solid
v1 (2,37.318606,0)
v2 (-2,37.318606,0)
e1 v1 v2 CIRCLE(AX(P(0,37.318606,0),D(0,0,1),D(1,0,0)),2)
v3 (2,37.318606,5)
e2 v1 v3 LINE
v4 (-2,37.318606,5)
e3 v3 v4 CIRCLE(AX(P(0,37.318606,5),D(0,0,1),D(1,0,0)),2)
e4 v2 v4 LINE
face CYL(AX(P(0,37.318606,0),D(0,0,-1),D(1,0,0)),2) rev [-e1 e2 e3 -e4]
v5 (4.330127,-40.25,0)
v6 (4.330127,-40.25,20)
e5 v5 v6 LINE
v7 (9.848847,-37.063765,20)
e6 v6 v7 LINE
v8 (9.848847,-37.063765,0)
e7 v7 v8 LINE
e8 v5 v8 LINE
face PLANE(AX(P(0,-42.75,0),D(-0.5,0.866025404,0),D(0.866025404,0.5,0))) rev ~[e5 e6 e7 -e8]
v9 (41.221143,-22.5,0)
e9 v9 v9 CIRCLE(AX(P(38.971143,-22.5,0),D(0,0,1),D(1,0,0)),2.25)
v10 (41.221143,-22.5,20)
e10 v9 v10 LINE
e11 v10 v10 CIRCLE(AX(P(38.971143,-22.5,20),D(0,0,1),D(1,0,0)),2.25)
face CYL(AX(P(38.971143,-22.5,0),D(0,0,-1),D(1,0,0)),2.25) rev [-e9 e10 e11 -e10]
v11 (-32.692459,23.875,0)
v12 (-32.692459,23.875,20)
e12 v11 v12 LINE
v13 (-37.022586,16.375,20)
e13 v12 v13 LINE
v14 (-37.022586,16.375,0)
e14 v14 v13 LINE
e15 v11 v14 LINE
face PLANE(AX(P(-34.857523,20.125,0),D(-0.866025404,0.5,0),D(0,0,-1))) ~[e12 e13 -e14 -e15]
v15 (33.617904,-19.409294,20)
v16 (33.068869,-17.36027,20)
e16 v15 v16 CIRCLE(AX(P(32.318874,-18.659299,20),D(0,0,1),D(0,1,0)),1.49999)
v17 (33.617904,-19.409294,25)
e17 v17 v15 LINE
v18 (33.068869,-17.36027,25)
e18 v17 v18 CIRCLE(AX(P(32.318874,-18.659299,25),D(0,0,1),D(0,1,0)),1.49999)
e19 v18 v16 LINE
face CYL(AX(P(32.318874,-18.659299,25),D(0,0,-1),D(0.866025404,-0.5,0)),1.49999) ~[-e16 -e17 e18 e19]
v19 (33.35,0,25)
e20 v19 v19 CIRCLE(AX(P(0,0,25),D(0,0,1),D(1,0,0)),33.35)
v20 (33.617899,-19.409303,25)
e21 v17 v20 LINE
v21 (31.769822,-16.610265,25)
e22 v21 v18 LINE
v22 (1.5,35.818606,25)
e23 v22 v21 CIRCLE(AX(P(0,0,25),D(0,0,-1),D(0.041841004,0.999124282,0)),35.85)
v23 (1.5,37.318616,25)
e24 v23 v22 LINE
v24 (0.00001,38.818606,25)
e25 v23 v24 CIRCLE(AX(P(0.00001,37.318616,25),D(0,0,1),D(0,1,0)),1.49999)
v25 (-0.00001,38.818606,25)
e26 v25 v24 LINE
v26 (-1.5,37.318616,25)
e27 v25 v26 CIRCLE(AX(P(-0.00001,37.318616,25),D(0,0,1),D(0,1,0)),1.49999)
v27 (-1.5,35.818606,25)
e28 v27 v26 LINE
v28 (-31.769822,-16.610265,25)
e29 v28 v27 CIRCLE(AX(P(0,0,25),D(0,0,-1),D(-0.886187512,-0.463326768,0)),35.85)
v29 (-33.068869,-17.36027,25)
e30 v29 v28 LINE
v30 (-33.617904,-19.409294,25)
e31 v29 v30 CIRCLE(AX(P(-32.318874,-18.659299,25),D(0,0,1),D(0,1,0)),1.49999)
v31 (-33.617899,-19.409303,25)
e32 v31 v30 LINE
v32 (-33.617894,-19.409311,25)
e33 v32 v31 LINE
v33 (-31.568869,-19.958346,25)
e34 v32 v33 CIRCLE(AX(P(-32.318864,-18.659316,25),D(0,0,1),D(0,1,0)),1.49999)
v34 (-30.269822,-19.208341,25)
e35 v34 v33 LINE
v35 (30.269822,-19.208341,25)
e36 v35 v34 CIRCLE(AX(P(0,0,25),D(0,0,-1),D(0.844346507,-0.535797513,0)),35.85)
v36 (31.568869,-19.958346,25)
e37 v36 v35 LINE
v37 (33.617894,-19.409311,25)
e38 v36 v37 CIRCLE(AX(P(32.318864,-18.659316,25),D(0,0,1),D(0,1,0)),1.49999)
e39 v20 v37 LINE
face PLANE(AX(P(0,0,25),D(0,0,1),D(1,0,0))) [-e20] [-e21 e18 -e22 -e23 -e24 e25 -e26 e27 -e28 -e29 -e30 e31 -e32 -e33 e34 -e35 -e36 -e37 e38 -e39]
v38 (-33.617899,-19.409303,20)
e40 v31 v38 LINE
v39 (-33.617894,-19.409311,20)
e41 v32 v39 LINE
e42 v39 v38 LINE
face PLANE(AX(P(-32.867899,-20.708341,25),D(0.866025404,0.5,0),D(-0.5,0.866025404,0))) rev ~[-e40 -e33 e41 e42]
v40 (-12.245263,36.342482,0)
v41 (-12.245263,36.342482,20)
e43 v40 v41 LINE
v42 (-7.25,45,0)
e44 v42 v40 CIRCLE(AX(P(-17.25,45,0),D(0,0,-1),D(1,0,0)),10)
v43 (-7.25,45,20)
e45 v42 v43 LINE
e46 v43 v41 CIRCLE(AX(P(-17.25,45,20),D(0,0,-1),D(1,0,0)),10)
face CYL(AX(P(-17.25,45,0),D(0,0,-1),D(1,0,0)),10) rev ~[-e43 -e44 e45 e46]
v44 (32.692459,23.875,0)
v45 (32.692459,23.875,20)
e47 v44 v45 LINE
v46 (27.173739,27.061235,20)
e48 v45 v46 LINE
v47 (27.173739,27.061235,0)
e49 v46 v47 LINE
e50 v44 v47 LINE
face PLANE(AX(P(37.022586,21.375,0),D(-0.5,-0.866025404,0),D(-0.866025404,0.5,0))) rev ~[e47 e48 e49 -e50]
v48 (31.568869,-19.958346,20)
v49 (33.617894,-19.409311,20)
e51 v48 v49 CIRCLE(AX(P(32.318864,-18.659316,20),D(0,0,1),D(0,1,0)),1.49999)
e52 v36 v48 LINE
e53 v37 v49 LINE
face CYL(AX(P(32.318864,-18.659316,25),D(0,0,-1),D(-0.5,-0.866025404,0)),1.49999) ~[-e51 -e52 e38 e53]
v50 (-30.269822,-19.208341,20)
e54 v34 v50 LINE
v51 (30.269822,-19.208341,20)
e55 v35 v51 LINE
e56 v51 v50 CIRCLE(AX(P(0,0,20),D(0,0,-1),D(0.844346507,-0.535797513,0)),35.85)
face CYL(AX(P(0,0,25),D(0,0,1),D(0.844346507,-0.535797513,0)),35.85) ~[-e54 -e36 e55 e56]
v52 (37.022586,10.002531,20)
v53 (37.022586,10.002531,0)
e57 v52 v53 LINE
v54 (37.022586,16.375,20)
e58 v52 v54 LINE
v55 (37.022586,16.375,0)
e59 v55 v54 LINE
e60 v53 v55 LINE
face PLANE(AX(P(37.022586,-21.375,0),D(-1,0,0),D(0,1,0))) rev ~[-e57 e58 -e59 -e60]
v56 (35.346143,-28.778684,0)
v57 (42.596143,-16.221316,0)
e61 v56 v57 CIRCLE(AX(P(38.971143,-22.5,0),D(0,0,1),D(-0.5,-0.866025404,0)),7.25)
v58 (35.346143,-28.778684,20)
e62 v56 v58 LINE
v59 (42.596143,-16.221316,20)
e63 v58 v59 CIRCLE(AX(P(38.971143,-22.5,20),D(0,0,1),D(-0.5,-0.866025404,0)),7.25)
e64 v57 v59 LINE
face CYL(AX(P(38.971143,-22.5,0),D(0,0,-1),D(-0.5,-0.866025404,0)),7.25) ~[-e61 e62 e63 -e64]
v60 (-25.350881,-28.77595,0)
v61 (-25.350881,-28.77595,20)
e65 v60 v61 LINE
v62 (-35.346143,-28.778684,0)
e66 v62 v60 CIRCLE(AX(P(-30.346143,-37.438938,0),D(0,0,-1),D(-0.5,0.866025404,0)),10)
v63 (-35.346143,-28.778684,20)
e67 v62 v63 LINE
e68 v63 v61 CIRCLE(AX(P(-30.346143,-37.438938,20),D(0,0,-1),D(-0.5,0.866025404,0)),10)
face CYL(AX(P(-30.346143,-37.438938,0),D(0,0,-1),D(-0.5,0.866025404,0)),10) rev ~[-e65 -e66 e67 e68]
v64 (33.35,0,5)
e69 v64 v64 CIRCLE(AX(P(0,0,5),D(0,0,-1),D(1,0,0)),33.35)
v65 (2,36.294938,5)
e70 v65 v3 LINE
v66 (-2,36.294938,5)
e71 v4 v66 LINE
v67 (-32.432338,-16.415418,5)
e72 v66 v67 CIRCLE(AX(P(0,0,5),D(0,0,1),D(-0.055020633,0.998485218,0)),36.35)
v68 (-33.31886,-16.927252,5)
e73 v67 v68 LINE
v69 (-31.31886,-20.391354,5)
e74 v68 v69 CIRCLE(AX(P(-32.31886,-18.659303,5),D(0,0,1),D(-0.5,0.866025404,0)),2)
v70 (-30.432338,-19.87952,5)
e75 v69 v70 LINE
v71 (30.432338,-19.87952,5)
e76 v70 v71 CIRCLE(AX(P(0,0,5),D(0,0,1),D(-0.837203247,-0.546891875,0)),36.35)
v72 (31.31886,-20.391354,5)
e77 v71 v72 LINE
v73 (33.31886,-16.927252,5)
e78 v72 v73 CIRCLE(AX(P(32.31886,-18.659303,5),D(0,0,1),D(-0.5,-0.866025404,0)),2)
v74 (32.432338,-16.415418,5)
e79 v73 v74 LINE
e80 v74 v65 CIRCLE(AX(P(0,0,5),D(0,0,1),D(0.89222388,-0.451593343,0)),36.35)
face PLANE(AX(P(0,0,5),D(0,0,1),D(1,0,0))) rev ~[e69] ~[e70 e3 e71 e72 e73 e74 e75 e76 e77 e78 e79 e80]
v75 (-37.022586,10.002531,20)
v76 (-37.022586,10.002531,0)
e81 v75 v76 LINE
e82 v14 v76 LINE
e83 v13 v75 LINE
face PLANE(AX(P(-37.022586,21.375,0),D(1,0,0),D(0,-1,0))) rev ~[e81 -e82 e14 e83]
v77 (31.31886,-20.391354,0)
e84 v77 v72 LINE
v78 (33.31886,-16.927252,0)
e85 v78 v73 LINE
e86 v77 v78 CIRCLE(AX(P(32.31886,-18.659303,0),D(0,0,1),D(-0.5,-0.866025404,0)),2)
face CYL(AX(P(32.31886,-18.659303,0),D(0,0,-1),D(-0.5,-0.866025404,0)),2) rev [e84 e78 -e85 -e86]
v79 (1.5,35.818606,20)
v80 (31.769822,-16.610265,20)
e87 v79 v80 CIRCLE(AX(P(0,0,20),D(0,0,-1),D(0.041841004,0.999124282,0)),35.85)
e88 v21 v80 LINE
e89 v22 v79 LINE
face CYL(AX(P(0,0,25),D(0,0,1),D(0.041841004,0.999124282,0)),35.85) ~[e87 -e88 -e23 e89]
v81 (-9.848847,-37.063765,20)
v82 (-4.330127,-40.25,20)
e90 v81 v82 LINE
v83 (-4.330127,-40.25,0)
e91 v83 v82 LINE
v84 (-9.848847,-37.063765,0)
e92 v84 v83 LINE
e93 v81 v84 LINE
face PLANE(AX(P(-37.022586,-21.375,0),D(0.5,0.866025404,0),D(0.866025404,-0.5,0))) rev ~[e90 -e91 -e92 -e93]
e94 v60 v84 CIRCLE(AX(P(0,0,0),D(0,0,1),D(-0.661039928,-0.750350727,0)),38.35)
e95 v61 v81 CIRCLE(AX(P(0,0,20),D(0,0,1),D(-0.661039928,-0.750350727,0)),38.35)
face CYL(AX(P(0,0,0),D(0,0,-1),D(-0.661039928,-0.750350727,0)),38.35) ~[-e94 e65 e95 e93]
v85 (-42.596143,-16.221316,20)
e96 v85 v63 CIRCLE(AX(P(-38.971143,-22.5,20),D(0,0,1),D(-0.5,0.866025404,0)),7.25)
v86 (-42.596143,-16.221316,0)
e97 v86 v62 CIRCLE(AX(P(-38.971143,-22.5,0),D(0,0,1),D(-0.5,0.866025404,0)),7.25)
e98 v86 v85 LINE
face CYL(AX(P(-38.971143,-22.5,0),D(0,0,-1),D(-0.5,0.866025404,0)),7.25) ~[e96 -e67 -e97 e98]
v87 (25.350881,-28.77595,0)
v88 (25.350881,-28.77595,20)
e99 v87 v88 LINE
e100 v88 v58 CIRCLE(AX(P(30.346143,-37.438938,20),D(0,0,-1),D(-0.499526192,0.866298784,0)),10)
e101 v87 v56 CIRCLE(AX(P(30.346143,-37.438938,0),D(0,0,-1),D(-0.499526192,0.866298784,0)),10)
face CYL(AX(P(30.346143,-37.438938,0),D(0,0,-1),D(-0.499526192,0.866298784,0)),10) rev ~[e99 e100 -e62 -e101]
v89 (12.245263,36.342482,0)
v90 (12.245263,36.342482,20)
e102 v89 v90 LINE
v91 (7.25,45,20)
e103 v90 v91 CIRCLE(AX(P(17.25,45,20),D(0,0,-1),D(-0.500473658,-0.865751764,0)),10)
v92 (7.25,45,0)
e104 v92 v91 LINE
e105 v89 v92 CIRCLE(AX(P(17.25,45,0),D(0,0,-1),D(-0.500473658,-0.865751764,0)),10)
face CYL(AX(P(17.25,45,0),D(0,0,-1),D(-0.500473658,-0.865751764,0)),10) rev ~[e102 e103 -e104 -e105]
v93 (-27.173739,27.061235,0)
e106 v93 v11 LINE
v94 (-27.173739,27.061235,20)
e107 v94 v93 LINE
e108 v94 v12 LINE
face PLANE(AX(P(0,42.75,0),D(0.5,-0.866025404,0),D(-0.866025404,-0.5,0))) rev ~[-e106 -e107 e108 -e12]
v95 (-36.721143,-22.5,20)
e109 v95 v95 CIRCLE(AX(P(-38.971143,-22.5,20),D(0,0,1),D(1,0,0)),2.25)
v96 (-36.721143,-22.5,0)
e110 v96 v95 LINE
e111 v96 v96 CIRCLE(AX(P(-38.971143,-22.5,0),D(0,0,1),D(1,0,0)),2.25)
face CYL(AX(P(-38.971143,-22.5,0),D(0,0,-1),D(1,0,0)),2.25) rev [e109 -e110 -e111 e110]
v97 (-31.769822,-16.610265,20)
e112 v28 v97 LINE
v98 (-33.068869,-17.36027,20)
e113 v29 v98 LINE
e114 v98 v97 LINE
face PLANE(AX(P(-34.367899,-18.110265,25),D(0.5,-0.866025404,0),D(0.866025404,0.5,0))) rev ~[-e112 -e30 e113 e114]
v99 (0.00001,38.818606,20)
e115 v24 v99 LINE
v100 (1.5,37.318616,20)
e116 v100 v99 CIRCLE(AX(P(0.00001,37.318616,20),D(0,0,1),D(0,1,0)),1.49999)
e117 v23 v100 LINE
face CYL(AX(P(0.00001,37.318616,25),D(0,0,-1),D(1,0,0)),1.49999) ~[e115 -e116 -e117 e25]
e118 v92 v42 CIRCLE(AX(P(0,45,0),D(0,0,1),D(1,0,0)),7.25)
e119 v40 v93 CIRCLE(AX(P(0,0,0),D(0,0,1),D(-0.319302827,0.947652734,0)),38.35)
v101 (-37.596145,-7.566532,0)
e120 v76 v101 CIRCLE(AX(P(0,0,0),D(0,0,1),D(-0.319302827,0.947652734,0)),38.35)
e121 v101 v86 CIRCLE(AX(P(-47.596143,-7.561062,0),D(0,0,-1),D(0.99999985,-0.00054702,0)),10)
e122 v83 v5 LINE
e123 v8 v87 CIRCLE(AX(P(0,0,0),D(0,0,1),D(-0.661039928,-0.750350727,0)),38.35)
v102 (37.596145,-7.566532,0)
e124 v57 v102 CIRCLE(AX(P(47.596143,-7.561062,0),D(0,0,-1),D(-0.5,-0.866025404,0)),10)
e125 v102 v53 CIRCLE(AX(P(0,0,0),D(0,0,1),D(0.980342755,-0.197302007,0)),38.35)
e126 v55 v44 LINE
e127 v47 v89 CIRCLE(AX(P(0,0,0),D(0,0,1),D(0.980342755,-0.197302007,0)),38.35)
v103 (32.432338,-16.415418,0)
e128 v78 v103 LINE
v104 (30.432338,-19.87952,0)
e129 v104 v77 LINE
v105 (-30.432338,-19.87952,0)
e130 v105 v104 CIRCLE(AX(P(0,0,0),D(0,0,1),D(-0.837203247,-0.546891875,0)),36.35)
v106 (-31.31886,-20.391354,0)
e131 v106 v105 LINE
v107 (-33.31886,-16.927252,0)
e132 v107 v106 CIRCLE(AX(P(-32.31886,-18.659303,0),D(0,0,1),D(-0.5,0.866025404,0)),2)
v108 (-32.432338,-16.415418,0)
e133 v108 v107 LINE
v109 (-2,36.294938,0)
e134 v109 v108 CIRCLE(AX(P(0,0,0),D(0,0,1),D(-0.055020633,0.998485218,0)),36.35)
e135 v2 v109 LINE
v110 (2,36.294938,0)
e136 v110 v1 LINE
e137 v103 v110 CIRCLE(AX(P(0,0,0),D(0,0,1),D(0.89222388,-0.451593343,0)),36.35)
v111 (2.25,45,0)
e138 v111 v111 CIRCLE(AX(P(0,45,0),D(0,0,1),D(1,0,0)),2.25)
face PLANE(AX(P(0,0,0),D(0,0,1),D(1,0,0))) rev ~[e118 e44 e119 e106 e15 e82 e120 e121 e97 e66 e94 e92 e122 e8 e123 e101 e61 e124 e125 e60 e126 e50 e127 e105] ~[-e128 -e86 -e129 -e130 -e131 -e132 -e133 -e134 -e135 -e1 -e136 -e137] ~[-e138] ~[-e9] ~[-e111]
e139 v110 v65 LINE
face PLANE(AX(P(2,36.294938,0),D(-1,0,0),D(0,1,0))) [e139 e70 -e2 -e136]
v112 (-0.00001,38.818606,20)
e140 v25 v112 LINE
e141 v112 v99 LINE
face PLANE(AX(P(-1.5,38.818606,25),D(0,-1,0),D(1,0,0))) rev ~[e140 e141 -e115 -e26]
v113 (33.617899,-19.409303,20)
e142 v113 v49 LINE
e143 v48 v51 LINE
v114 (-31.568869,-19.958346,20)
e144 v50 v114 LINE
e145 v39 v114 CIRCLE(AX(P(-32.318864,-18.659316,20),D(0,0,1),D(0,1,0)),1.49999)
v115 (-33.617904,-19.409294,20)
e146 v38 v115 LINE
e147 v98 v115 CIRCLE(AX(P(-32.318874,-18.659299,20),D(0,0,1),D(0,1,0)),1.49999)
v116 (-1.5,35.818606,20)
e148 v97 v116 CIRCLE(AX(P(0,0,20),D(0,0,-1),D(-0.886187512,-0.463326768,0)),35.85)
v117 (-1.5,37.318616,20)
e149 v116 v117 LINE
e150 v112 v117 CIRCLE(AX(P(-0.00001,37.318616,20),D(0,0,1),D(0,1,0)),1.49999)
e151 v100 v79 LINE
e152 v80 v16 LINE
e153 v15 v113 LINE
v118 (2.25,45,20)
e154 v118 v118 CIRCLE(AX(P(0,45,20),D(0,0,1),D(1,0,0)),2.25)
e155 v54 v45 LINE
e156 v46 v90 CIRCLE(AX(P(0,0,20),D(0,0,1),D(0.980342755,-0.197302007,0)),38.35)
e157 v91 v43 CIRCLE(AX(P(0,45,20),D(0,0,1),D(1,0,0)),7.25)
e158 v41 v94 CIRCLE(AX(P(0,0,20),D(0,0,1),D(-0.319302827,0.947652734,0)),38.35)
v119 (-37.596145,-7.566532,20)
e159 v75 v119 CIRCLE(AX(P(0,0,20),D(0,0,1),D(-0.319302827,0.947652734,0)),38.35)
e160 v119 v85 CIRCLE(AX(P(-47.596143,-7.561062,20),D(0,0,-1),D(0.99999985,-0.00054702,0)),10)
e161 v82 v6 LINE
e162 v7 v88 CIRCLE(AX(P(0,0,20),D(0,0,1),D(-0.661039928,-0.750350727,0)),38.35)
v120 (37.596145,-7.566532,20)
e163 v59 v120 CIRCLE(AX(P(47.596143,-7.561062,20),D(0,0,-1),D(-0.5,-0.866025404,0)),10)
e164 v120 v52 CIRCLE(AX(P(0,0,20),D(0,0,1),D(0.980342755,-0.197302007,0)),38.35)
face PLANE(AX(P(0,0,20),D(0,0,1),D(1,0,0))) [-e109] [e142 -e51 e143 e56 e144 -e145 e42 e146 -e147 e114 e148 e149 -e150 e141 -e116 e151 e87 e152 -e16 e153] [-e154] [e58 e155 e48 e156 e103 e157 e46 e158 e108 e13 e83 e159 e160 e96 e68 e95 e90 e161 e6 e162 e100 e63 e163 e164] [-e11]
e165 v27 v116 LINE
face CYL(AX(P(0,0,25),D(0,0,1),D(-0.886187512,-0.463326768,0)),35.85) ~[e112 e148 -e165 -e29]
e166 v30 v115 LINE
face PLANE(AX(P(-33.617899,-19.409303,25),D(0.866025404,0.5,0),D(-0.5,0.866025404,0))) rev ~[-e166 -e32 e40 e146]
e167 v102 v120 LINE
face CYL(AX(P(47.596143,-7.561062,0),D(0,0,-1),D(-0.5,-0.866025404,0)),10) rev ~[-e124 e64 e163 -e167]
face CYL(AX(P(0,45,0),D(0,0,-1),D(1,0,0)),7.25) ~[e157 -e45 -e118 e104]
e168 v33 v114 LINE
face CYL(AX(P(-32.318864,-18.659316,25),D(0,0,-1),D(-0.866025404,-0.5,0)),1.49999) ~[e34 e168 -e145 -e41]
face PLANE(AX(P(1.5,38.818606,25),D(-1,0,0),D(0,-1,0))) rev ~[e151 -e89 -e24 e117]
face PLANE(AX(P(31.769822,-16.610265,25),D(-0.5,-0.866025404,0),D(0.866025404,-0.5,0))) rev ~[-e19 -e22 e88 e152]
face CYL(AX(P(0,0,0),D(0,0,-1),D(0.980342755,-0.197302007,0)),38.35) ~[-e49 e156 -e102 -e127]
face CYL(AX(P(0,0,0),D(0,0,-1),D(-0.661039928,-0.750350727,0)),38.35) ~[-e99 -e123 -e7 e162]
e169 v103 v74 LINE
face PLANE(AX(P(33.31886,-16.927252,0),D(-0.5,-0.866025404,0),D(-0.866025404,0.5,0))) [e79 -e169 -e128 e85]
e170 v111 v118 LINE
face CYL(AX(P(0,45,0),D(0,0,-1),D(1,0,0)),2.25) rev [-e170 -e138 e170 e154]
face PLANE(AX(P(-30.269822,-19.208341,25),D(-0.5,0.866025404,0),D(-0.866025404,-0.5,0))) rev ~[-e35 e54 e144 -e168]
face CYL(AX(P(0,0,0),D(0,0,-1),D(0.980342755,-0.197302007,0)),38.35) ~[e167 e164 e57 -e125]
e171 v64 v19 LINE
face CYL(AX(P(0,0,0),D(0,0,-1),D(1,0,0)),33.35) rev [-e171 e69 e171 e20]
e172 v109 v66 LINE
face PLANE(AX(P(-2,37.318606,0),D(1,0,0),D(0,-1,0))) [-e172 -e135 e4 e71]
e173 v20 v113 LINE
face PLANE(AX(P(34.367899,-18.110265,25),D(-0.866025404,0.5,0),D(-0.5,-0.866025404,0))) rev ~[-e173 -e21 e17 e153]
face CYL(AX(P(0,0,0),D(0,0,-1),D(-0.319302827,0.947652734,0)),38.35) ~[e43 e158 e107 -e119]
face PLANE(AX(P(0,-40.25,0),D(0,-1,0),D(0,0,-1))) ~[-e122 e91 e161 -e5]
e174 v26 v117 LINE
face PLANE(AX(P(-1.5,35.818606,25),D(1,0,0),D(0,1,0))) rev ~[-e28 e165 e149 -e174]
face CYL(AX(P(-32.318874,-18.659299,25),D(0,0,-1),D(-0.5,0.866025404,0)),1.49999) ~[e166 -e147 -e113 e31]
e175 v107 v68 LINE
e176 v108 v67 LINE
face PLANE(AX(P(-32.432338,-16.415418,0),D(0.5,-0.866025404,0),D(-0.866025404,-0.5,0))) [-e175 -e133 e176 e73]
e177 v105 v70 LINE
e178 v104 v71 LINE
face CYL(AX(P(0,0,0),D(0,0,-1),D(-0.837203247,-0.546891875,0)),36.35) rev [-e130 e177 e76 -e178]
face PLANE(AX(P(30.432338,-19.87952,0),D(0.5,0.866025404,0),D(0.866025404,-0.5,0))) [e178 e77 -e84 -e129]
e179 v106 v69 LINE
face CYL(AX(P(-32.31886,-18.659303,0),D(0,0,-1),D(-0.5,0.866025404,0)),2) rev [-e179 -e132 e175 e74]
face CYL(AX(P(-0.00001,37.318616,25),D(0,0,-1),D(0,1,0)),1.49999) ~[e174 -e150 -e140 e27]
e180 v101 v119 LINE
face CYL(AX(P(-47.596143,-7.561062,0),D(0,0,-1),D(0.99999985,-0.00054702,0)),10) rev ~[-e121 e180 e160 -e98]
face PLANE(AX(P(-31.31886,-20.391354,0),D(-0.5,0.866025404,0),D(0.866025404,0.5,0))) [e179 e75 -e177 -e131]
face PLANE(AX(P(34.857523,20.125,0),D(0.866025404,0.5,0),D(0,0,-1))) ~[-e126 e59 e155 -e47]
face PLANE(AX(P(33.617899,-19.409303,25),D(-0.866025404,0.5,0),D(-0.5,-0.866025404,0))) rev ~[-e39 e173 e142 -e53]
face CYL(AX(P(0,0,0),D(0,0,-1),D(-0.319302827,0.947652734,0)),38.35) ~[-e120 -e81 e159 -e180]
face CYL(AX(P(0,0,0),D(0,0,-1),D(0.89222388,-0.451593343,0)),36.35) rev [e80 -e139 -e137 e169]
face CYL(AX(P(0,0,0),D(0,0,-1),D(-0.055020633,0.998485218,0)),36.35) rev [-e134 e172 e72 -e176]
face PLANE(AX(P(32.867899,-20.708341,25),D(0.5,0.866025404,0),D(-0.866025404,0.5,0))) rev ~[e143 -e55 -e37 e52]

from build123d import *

# Parameters (mm, degrees)
F0_R     = 2.25
F0_R_2   = 33.35
F1_DEPTH = 20
F2_R     = 33.35
F3_DEPTH = 25
F5_DEPTH = 5
F6_R     = 1.49999
F8_DEPTH = 5
F9_SIZE  = 5


# Not quite as in the source:
# - a fillet or chamfer is up to 0.001 mm smaller than in the source, because OpenCascade refuses the exact size


with BuildPart() as f1:
    # F0 (on Top) → F1 (new body)
    with BuildSketch(Plane.XY):
        with BuildLine():
            ThreePointArc((-35.3461431703, -28.7786841774), (-30.3488782685, -27.4389385893), (-25.3508812473, -28.775950375))
            ThreePointArc((-25.3508812473, -28.775950375), (0, -38.35), (25.3508812473, -28.775950375))
            ThreePointArc((25.3508812473, -28.775950375), (30.3488782685, -27.4389385893), (35.3461431703, -28.7786841774))
            ThreePointArc((35.3461431703, -28.7786841774), (45.2498273477, -26.125), (42.5961431703, -16.2213158226))
            ThreePointArc((42.5961431703, -16.2213158226), (38.9372570055, -12.5634302623), (37.5961446665, -7.566531981))
            ThreePointArc((37.5961446665, -7.566531981), (33.2120742351, 19.175), (12.2452634191, 36.342482356))
            ThreePointArc((12.2452634191, 36.342482356), (8.588378737, 40.0023688516), (7.25, 45))
            ThreePointArc((7.25, 45), (0, 52.25), (-7.25, 45))
            ThreePointArc((-7.25, 45), (-8.588378737, 40.0023688516), (-12.2452634191, 36.342482356))
            ThreePointArc((-12.2452634191, 36.342482356), (-33.2120742351, 19.175), (-37.5961446665, -7.566531981))
            ThreePointArc((-37.5961446665, -7.566531981), (-38.9372570055, -12.5634302623), (-42.5961431703, -16.2213158226))
            ThreePointArc((-42.5961431703, -16.2213158226), (-45.2498273477, -26.125), (-35.3461431703, -28.7786841774))
        make_face()
        with Locations((-38.9711431703, -22.5)):
            Circle(F0_R, mode=Mode.SUBTRACT)
        with Locations((38.9711431703, -22.5)):
            Circle(F0_R, mode=Mode.SUBTRACT)
        Circle(F0_R_2, mode=Mode.SUBTRACT)
        with Locations((0, 45)):
            Circle(F0_R, mode=Mode.SUBTRACT)
    extrude(amount=F1_DEPTH)

    # F2 (on Top) → F3 (join)
    with BuildSketch(Plane.XY):
        Polygon((37.0225860118, -21.375), (37.0225860118, 21.375), (0, 42.75), (-37.0225860118, 21.375), (-37.0225860118, -21.375), (0, -42.75), align=None)
        Circle(F2_R, mode=Mode.SUBTRACT)
    extrude(amount=F3_DEPTH)

    # F4 (on face) → F5 (cut)
    with BuildSketch(Plane.XY.offset(25)):
        Polygon((37.0225860118, -21.375), (37.0225860118, 21.375), (0, 42.75), (-37.0225860118, 21.375), (-37.0225860118, -21.375), (0, -42.75), align=None)
        with BuildLine():
            ThreePointArc((-31.7698222916, -16.6102646446), (-31.0470107257, 17.925), (-1.5, 35.8186055005))
            Line((-1.5, 35.8186055005), (-1.5, 38.8186055005))
            Line((-1.5, 38.8186055005), (0, 38.8186055005))
            Line((0, 38.8186055005), (1.5, 38.8186055005))
            Line((1.5, 38.8186055005), (1.5, 35.8186055005))
            ThreePointArc((1.5, 35.8186055005), (31.0470107257, 17.925), (31.7698222916, -16.6102646446))
            Line((31.7698222916, -16.6102646446), (34.3678985029, -18.1102646446))
            Line((34.3678985029, -18.1102646446), (33.6178985029, -19.4093027502))
            Line((33.6178985029, -19.4093027502), (32.8678985029, -20.7083408559))
            Line((32.8678985029, -20.7083408559), (30.2698222916, -19.2083408559))
            ThreePointArc((30.2698222916, -19.2083408559), (0, -35.85), (-30.2698222916, -19.2083408559))
            Line((-30.2698222916, -19.2083408559), (-32.8678985029, -20.7083408559))
            Line((-32.8678985029, -20.7083408559), (-33.6178985029, -19.4093027502))
            Line((-33.6178985029, -19.4093027502), (-34.3678985029, -18.1102646446))
            Line((-34.3678985029, -18.1102646446), (-31.7698222916, -16.6102646446))
        make_face(mode=Mode.SUBTRACT)
    extrude(amount=-F5_DEPTH, mode=Mode.SUBTRACT)

    # F6 (radius 1.5 in the source; OpenCascade refuses exactly that, so slightly less here)
    f6_edges = [f1.edges().sort_by_distance(p)[0] for p in [
        (-32.867899, -20.708341, 22.5),
        (-34.367899, -18.110265, 22.5),
        (32.867899, -20.708341, 22.5),
        (34.367899, -18.110265, 22.5),
        (1.5, 38.818606, 22.5),
        (-1.5, 38.818606, 22.5),
    ]]
    fillet(f6_edges, radius=F6_R)

    # F7 (on Top) → F8 (cut)
    with BuildSketch(Plane.XY):
        with BuildLine():
            Line((-31.3188603972, -20.3913535578), (-30.4323380454, -19.8795196393))
            ThreePointArc((-30.4323380454, -19.8795196393), (0, -36.35), (30.4323380454, -19.8795196393))
            Line((30.4323380454, -19.8795196393), (31.3188603972, -20.3913535578))
            ThreePointArc((31.3188603972, -20.3913535578), (34.0509112048, -19.6593027502), (33.3188603972, -16.9272519427))
            Line((33.3188603972, -16.9272519427), (32.4323380454, -16.4154180242))
            ThreePointArc((32.4323380454, -16.4154180242), (31.4800234276, 18.175), (2, 36.2949376635))
            Line((2, 36.2949376635), (2, 37.3186055005))
            ThreePointArc((2, 37.3186055005), (0, 39.3186055005), (-2, 37.3186055005))
            Line((-2, 37.3186055005), (-2, 36.2949376635))
            ThreePointArc((-2, 36.2949376635), (-31.4800234276, 18.175), (-32.4323380454, -16.4154180242))
            Line((-32.4323380454, -16.4154180242), (-33.3188603972, -16.9272519427))
            ThreePointArc((-33.3188603972, -16.9272519427), (-34.0509112048, -19.6593027502), (-31.3188603972, -20.3913535578))
        make_face()
    extrude(amount=F8_DEPTH, mode=Mode.SUBTRACT)

    # F9
    f9_edges = [f1.edges().sort_by_distance(p)[0] for p in [
        (0, -42.75, 10),
        (37.022586, 21.375, 10),
        (-37.022586, 21.375, 10),
    ]]
    chamfer(f9_edges, length=F9_SIZE)


solid = f1.part
